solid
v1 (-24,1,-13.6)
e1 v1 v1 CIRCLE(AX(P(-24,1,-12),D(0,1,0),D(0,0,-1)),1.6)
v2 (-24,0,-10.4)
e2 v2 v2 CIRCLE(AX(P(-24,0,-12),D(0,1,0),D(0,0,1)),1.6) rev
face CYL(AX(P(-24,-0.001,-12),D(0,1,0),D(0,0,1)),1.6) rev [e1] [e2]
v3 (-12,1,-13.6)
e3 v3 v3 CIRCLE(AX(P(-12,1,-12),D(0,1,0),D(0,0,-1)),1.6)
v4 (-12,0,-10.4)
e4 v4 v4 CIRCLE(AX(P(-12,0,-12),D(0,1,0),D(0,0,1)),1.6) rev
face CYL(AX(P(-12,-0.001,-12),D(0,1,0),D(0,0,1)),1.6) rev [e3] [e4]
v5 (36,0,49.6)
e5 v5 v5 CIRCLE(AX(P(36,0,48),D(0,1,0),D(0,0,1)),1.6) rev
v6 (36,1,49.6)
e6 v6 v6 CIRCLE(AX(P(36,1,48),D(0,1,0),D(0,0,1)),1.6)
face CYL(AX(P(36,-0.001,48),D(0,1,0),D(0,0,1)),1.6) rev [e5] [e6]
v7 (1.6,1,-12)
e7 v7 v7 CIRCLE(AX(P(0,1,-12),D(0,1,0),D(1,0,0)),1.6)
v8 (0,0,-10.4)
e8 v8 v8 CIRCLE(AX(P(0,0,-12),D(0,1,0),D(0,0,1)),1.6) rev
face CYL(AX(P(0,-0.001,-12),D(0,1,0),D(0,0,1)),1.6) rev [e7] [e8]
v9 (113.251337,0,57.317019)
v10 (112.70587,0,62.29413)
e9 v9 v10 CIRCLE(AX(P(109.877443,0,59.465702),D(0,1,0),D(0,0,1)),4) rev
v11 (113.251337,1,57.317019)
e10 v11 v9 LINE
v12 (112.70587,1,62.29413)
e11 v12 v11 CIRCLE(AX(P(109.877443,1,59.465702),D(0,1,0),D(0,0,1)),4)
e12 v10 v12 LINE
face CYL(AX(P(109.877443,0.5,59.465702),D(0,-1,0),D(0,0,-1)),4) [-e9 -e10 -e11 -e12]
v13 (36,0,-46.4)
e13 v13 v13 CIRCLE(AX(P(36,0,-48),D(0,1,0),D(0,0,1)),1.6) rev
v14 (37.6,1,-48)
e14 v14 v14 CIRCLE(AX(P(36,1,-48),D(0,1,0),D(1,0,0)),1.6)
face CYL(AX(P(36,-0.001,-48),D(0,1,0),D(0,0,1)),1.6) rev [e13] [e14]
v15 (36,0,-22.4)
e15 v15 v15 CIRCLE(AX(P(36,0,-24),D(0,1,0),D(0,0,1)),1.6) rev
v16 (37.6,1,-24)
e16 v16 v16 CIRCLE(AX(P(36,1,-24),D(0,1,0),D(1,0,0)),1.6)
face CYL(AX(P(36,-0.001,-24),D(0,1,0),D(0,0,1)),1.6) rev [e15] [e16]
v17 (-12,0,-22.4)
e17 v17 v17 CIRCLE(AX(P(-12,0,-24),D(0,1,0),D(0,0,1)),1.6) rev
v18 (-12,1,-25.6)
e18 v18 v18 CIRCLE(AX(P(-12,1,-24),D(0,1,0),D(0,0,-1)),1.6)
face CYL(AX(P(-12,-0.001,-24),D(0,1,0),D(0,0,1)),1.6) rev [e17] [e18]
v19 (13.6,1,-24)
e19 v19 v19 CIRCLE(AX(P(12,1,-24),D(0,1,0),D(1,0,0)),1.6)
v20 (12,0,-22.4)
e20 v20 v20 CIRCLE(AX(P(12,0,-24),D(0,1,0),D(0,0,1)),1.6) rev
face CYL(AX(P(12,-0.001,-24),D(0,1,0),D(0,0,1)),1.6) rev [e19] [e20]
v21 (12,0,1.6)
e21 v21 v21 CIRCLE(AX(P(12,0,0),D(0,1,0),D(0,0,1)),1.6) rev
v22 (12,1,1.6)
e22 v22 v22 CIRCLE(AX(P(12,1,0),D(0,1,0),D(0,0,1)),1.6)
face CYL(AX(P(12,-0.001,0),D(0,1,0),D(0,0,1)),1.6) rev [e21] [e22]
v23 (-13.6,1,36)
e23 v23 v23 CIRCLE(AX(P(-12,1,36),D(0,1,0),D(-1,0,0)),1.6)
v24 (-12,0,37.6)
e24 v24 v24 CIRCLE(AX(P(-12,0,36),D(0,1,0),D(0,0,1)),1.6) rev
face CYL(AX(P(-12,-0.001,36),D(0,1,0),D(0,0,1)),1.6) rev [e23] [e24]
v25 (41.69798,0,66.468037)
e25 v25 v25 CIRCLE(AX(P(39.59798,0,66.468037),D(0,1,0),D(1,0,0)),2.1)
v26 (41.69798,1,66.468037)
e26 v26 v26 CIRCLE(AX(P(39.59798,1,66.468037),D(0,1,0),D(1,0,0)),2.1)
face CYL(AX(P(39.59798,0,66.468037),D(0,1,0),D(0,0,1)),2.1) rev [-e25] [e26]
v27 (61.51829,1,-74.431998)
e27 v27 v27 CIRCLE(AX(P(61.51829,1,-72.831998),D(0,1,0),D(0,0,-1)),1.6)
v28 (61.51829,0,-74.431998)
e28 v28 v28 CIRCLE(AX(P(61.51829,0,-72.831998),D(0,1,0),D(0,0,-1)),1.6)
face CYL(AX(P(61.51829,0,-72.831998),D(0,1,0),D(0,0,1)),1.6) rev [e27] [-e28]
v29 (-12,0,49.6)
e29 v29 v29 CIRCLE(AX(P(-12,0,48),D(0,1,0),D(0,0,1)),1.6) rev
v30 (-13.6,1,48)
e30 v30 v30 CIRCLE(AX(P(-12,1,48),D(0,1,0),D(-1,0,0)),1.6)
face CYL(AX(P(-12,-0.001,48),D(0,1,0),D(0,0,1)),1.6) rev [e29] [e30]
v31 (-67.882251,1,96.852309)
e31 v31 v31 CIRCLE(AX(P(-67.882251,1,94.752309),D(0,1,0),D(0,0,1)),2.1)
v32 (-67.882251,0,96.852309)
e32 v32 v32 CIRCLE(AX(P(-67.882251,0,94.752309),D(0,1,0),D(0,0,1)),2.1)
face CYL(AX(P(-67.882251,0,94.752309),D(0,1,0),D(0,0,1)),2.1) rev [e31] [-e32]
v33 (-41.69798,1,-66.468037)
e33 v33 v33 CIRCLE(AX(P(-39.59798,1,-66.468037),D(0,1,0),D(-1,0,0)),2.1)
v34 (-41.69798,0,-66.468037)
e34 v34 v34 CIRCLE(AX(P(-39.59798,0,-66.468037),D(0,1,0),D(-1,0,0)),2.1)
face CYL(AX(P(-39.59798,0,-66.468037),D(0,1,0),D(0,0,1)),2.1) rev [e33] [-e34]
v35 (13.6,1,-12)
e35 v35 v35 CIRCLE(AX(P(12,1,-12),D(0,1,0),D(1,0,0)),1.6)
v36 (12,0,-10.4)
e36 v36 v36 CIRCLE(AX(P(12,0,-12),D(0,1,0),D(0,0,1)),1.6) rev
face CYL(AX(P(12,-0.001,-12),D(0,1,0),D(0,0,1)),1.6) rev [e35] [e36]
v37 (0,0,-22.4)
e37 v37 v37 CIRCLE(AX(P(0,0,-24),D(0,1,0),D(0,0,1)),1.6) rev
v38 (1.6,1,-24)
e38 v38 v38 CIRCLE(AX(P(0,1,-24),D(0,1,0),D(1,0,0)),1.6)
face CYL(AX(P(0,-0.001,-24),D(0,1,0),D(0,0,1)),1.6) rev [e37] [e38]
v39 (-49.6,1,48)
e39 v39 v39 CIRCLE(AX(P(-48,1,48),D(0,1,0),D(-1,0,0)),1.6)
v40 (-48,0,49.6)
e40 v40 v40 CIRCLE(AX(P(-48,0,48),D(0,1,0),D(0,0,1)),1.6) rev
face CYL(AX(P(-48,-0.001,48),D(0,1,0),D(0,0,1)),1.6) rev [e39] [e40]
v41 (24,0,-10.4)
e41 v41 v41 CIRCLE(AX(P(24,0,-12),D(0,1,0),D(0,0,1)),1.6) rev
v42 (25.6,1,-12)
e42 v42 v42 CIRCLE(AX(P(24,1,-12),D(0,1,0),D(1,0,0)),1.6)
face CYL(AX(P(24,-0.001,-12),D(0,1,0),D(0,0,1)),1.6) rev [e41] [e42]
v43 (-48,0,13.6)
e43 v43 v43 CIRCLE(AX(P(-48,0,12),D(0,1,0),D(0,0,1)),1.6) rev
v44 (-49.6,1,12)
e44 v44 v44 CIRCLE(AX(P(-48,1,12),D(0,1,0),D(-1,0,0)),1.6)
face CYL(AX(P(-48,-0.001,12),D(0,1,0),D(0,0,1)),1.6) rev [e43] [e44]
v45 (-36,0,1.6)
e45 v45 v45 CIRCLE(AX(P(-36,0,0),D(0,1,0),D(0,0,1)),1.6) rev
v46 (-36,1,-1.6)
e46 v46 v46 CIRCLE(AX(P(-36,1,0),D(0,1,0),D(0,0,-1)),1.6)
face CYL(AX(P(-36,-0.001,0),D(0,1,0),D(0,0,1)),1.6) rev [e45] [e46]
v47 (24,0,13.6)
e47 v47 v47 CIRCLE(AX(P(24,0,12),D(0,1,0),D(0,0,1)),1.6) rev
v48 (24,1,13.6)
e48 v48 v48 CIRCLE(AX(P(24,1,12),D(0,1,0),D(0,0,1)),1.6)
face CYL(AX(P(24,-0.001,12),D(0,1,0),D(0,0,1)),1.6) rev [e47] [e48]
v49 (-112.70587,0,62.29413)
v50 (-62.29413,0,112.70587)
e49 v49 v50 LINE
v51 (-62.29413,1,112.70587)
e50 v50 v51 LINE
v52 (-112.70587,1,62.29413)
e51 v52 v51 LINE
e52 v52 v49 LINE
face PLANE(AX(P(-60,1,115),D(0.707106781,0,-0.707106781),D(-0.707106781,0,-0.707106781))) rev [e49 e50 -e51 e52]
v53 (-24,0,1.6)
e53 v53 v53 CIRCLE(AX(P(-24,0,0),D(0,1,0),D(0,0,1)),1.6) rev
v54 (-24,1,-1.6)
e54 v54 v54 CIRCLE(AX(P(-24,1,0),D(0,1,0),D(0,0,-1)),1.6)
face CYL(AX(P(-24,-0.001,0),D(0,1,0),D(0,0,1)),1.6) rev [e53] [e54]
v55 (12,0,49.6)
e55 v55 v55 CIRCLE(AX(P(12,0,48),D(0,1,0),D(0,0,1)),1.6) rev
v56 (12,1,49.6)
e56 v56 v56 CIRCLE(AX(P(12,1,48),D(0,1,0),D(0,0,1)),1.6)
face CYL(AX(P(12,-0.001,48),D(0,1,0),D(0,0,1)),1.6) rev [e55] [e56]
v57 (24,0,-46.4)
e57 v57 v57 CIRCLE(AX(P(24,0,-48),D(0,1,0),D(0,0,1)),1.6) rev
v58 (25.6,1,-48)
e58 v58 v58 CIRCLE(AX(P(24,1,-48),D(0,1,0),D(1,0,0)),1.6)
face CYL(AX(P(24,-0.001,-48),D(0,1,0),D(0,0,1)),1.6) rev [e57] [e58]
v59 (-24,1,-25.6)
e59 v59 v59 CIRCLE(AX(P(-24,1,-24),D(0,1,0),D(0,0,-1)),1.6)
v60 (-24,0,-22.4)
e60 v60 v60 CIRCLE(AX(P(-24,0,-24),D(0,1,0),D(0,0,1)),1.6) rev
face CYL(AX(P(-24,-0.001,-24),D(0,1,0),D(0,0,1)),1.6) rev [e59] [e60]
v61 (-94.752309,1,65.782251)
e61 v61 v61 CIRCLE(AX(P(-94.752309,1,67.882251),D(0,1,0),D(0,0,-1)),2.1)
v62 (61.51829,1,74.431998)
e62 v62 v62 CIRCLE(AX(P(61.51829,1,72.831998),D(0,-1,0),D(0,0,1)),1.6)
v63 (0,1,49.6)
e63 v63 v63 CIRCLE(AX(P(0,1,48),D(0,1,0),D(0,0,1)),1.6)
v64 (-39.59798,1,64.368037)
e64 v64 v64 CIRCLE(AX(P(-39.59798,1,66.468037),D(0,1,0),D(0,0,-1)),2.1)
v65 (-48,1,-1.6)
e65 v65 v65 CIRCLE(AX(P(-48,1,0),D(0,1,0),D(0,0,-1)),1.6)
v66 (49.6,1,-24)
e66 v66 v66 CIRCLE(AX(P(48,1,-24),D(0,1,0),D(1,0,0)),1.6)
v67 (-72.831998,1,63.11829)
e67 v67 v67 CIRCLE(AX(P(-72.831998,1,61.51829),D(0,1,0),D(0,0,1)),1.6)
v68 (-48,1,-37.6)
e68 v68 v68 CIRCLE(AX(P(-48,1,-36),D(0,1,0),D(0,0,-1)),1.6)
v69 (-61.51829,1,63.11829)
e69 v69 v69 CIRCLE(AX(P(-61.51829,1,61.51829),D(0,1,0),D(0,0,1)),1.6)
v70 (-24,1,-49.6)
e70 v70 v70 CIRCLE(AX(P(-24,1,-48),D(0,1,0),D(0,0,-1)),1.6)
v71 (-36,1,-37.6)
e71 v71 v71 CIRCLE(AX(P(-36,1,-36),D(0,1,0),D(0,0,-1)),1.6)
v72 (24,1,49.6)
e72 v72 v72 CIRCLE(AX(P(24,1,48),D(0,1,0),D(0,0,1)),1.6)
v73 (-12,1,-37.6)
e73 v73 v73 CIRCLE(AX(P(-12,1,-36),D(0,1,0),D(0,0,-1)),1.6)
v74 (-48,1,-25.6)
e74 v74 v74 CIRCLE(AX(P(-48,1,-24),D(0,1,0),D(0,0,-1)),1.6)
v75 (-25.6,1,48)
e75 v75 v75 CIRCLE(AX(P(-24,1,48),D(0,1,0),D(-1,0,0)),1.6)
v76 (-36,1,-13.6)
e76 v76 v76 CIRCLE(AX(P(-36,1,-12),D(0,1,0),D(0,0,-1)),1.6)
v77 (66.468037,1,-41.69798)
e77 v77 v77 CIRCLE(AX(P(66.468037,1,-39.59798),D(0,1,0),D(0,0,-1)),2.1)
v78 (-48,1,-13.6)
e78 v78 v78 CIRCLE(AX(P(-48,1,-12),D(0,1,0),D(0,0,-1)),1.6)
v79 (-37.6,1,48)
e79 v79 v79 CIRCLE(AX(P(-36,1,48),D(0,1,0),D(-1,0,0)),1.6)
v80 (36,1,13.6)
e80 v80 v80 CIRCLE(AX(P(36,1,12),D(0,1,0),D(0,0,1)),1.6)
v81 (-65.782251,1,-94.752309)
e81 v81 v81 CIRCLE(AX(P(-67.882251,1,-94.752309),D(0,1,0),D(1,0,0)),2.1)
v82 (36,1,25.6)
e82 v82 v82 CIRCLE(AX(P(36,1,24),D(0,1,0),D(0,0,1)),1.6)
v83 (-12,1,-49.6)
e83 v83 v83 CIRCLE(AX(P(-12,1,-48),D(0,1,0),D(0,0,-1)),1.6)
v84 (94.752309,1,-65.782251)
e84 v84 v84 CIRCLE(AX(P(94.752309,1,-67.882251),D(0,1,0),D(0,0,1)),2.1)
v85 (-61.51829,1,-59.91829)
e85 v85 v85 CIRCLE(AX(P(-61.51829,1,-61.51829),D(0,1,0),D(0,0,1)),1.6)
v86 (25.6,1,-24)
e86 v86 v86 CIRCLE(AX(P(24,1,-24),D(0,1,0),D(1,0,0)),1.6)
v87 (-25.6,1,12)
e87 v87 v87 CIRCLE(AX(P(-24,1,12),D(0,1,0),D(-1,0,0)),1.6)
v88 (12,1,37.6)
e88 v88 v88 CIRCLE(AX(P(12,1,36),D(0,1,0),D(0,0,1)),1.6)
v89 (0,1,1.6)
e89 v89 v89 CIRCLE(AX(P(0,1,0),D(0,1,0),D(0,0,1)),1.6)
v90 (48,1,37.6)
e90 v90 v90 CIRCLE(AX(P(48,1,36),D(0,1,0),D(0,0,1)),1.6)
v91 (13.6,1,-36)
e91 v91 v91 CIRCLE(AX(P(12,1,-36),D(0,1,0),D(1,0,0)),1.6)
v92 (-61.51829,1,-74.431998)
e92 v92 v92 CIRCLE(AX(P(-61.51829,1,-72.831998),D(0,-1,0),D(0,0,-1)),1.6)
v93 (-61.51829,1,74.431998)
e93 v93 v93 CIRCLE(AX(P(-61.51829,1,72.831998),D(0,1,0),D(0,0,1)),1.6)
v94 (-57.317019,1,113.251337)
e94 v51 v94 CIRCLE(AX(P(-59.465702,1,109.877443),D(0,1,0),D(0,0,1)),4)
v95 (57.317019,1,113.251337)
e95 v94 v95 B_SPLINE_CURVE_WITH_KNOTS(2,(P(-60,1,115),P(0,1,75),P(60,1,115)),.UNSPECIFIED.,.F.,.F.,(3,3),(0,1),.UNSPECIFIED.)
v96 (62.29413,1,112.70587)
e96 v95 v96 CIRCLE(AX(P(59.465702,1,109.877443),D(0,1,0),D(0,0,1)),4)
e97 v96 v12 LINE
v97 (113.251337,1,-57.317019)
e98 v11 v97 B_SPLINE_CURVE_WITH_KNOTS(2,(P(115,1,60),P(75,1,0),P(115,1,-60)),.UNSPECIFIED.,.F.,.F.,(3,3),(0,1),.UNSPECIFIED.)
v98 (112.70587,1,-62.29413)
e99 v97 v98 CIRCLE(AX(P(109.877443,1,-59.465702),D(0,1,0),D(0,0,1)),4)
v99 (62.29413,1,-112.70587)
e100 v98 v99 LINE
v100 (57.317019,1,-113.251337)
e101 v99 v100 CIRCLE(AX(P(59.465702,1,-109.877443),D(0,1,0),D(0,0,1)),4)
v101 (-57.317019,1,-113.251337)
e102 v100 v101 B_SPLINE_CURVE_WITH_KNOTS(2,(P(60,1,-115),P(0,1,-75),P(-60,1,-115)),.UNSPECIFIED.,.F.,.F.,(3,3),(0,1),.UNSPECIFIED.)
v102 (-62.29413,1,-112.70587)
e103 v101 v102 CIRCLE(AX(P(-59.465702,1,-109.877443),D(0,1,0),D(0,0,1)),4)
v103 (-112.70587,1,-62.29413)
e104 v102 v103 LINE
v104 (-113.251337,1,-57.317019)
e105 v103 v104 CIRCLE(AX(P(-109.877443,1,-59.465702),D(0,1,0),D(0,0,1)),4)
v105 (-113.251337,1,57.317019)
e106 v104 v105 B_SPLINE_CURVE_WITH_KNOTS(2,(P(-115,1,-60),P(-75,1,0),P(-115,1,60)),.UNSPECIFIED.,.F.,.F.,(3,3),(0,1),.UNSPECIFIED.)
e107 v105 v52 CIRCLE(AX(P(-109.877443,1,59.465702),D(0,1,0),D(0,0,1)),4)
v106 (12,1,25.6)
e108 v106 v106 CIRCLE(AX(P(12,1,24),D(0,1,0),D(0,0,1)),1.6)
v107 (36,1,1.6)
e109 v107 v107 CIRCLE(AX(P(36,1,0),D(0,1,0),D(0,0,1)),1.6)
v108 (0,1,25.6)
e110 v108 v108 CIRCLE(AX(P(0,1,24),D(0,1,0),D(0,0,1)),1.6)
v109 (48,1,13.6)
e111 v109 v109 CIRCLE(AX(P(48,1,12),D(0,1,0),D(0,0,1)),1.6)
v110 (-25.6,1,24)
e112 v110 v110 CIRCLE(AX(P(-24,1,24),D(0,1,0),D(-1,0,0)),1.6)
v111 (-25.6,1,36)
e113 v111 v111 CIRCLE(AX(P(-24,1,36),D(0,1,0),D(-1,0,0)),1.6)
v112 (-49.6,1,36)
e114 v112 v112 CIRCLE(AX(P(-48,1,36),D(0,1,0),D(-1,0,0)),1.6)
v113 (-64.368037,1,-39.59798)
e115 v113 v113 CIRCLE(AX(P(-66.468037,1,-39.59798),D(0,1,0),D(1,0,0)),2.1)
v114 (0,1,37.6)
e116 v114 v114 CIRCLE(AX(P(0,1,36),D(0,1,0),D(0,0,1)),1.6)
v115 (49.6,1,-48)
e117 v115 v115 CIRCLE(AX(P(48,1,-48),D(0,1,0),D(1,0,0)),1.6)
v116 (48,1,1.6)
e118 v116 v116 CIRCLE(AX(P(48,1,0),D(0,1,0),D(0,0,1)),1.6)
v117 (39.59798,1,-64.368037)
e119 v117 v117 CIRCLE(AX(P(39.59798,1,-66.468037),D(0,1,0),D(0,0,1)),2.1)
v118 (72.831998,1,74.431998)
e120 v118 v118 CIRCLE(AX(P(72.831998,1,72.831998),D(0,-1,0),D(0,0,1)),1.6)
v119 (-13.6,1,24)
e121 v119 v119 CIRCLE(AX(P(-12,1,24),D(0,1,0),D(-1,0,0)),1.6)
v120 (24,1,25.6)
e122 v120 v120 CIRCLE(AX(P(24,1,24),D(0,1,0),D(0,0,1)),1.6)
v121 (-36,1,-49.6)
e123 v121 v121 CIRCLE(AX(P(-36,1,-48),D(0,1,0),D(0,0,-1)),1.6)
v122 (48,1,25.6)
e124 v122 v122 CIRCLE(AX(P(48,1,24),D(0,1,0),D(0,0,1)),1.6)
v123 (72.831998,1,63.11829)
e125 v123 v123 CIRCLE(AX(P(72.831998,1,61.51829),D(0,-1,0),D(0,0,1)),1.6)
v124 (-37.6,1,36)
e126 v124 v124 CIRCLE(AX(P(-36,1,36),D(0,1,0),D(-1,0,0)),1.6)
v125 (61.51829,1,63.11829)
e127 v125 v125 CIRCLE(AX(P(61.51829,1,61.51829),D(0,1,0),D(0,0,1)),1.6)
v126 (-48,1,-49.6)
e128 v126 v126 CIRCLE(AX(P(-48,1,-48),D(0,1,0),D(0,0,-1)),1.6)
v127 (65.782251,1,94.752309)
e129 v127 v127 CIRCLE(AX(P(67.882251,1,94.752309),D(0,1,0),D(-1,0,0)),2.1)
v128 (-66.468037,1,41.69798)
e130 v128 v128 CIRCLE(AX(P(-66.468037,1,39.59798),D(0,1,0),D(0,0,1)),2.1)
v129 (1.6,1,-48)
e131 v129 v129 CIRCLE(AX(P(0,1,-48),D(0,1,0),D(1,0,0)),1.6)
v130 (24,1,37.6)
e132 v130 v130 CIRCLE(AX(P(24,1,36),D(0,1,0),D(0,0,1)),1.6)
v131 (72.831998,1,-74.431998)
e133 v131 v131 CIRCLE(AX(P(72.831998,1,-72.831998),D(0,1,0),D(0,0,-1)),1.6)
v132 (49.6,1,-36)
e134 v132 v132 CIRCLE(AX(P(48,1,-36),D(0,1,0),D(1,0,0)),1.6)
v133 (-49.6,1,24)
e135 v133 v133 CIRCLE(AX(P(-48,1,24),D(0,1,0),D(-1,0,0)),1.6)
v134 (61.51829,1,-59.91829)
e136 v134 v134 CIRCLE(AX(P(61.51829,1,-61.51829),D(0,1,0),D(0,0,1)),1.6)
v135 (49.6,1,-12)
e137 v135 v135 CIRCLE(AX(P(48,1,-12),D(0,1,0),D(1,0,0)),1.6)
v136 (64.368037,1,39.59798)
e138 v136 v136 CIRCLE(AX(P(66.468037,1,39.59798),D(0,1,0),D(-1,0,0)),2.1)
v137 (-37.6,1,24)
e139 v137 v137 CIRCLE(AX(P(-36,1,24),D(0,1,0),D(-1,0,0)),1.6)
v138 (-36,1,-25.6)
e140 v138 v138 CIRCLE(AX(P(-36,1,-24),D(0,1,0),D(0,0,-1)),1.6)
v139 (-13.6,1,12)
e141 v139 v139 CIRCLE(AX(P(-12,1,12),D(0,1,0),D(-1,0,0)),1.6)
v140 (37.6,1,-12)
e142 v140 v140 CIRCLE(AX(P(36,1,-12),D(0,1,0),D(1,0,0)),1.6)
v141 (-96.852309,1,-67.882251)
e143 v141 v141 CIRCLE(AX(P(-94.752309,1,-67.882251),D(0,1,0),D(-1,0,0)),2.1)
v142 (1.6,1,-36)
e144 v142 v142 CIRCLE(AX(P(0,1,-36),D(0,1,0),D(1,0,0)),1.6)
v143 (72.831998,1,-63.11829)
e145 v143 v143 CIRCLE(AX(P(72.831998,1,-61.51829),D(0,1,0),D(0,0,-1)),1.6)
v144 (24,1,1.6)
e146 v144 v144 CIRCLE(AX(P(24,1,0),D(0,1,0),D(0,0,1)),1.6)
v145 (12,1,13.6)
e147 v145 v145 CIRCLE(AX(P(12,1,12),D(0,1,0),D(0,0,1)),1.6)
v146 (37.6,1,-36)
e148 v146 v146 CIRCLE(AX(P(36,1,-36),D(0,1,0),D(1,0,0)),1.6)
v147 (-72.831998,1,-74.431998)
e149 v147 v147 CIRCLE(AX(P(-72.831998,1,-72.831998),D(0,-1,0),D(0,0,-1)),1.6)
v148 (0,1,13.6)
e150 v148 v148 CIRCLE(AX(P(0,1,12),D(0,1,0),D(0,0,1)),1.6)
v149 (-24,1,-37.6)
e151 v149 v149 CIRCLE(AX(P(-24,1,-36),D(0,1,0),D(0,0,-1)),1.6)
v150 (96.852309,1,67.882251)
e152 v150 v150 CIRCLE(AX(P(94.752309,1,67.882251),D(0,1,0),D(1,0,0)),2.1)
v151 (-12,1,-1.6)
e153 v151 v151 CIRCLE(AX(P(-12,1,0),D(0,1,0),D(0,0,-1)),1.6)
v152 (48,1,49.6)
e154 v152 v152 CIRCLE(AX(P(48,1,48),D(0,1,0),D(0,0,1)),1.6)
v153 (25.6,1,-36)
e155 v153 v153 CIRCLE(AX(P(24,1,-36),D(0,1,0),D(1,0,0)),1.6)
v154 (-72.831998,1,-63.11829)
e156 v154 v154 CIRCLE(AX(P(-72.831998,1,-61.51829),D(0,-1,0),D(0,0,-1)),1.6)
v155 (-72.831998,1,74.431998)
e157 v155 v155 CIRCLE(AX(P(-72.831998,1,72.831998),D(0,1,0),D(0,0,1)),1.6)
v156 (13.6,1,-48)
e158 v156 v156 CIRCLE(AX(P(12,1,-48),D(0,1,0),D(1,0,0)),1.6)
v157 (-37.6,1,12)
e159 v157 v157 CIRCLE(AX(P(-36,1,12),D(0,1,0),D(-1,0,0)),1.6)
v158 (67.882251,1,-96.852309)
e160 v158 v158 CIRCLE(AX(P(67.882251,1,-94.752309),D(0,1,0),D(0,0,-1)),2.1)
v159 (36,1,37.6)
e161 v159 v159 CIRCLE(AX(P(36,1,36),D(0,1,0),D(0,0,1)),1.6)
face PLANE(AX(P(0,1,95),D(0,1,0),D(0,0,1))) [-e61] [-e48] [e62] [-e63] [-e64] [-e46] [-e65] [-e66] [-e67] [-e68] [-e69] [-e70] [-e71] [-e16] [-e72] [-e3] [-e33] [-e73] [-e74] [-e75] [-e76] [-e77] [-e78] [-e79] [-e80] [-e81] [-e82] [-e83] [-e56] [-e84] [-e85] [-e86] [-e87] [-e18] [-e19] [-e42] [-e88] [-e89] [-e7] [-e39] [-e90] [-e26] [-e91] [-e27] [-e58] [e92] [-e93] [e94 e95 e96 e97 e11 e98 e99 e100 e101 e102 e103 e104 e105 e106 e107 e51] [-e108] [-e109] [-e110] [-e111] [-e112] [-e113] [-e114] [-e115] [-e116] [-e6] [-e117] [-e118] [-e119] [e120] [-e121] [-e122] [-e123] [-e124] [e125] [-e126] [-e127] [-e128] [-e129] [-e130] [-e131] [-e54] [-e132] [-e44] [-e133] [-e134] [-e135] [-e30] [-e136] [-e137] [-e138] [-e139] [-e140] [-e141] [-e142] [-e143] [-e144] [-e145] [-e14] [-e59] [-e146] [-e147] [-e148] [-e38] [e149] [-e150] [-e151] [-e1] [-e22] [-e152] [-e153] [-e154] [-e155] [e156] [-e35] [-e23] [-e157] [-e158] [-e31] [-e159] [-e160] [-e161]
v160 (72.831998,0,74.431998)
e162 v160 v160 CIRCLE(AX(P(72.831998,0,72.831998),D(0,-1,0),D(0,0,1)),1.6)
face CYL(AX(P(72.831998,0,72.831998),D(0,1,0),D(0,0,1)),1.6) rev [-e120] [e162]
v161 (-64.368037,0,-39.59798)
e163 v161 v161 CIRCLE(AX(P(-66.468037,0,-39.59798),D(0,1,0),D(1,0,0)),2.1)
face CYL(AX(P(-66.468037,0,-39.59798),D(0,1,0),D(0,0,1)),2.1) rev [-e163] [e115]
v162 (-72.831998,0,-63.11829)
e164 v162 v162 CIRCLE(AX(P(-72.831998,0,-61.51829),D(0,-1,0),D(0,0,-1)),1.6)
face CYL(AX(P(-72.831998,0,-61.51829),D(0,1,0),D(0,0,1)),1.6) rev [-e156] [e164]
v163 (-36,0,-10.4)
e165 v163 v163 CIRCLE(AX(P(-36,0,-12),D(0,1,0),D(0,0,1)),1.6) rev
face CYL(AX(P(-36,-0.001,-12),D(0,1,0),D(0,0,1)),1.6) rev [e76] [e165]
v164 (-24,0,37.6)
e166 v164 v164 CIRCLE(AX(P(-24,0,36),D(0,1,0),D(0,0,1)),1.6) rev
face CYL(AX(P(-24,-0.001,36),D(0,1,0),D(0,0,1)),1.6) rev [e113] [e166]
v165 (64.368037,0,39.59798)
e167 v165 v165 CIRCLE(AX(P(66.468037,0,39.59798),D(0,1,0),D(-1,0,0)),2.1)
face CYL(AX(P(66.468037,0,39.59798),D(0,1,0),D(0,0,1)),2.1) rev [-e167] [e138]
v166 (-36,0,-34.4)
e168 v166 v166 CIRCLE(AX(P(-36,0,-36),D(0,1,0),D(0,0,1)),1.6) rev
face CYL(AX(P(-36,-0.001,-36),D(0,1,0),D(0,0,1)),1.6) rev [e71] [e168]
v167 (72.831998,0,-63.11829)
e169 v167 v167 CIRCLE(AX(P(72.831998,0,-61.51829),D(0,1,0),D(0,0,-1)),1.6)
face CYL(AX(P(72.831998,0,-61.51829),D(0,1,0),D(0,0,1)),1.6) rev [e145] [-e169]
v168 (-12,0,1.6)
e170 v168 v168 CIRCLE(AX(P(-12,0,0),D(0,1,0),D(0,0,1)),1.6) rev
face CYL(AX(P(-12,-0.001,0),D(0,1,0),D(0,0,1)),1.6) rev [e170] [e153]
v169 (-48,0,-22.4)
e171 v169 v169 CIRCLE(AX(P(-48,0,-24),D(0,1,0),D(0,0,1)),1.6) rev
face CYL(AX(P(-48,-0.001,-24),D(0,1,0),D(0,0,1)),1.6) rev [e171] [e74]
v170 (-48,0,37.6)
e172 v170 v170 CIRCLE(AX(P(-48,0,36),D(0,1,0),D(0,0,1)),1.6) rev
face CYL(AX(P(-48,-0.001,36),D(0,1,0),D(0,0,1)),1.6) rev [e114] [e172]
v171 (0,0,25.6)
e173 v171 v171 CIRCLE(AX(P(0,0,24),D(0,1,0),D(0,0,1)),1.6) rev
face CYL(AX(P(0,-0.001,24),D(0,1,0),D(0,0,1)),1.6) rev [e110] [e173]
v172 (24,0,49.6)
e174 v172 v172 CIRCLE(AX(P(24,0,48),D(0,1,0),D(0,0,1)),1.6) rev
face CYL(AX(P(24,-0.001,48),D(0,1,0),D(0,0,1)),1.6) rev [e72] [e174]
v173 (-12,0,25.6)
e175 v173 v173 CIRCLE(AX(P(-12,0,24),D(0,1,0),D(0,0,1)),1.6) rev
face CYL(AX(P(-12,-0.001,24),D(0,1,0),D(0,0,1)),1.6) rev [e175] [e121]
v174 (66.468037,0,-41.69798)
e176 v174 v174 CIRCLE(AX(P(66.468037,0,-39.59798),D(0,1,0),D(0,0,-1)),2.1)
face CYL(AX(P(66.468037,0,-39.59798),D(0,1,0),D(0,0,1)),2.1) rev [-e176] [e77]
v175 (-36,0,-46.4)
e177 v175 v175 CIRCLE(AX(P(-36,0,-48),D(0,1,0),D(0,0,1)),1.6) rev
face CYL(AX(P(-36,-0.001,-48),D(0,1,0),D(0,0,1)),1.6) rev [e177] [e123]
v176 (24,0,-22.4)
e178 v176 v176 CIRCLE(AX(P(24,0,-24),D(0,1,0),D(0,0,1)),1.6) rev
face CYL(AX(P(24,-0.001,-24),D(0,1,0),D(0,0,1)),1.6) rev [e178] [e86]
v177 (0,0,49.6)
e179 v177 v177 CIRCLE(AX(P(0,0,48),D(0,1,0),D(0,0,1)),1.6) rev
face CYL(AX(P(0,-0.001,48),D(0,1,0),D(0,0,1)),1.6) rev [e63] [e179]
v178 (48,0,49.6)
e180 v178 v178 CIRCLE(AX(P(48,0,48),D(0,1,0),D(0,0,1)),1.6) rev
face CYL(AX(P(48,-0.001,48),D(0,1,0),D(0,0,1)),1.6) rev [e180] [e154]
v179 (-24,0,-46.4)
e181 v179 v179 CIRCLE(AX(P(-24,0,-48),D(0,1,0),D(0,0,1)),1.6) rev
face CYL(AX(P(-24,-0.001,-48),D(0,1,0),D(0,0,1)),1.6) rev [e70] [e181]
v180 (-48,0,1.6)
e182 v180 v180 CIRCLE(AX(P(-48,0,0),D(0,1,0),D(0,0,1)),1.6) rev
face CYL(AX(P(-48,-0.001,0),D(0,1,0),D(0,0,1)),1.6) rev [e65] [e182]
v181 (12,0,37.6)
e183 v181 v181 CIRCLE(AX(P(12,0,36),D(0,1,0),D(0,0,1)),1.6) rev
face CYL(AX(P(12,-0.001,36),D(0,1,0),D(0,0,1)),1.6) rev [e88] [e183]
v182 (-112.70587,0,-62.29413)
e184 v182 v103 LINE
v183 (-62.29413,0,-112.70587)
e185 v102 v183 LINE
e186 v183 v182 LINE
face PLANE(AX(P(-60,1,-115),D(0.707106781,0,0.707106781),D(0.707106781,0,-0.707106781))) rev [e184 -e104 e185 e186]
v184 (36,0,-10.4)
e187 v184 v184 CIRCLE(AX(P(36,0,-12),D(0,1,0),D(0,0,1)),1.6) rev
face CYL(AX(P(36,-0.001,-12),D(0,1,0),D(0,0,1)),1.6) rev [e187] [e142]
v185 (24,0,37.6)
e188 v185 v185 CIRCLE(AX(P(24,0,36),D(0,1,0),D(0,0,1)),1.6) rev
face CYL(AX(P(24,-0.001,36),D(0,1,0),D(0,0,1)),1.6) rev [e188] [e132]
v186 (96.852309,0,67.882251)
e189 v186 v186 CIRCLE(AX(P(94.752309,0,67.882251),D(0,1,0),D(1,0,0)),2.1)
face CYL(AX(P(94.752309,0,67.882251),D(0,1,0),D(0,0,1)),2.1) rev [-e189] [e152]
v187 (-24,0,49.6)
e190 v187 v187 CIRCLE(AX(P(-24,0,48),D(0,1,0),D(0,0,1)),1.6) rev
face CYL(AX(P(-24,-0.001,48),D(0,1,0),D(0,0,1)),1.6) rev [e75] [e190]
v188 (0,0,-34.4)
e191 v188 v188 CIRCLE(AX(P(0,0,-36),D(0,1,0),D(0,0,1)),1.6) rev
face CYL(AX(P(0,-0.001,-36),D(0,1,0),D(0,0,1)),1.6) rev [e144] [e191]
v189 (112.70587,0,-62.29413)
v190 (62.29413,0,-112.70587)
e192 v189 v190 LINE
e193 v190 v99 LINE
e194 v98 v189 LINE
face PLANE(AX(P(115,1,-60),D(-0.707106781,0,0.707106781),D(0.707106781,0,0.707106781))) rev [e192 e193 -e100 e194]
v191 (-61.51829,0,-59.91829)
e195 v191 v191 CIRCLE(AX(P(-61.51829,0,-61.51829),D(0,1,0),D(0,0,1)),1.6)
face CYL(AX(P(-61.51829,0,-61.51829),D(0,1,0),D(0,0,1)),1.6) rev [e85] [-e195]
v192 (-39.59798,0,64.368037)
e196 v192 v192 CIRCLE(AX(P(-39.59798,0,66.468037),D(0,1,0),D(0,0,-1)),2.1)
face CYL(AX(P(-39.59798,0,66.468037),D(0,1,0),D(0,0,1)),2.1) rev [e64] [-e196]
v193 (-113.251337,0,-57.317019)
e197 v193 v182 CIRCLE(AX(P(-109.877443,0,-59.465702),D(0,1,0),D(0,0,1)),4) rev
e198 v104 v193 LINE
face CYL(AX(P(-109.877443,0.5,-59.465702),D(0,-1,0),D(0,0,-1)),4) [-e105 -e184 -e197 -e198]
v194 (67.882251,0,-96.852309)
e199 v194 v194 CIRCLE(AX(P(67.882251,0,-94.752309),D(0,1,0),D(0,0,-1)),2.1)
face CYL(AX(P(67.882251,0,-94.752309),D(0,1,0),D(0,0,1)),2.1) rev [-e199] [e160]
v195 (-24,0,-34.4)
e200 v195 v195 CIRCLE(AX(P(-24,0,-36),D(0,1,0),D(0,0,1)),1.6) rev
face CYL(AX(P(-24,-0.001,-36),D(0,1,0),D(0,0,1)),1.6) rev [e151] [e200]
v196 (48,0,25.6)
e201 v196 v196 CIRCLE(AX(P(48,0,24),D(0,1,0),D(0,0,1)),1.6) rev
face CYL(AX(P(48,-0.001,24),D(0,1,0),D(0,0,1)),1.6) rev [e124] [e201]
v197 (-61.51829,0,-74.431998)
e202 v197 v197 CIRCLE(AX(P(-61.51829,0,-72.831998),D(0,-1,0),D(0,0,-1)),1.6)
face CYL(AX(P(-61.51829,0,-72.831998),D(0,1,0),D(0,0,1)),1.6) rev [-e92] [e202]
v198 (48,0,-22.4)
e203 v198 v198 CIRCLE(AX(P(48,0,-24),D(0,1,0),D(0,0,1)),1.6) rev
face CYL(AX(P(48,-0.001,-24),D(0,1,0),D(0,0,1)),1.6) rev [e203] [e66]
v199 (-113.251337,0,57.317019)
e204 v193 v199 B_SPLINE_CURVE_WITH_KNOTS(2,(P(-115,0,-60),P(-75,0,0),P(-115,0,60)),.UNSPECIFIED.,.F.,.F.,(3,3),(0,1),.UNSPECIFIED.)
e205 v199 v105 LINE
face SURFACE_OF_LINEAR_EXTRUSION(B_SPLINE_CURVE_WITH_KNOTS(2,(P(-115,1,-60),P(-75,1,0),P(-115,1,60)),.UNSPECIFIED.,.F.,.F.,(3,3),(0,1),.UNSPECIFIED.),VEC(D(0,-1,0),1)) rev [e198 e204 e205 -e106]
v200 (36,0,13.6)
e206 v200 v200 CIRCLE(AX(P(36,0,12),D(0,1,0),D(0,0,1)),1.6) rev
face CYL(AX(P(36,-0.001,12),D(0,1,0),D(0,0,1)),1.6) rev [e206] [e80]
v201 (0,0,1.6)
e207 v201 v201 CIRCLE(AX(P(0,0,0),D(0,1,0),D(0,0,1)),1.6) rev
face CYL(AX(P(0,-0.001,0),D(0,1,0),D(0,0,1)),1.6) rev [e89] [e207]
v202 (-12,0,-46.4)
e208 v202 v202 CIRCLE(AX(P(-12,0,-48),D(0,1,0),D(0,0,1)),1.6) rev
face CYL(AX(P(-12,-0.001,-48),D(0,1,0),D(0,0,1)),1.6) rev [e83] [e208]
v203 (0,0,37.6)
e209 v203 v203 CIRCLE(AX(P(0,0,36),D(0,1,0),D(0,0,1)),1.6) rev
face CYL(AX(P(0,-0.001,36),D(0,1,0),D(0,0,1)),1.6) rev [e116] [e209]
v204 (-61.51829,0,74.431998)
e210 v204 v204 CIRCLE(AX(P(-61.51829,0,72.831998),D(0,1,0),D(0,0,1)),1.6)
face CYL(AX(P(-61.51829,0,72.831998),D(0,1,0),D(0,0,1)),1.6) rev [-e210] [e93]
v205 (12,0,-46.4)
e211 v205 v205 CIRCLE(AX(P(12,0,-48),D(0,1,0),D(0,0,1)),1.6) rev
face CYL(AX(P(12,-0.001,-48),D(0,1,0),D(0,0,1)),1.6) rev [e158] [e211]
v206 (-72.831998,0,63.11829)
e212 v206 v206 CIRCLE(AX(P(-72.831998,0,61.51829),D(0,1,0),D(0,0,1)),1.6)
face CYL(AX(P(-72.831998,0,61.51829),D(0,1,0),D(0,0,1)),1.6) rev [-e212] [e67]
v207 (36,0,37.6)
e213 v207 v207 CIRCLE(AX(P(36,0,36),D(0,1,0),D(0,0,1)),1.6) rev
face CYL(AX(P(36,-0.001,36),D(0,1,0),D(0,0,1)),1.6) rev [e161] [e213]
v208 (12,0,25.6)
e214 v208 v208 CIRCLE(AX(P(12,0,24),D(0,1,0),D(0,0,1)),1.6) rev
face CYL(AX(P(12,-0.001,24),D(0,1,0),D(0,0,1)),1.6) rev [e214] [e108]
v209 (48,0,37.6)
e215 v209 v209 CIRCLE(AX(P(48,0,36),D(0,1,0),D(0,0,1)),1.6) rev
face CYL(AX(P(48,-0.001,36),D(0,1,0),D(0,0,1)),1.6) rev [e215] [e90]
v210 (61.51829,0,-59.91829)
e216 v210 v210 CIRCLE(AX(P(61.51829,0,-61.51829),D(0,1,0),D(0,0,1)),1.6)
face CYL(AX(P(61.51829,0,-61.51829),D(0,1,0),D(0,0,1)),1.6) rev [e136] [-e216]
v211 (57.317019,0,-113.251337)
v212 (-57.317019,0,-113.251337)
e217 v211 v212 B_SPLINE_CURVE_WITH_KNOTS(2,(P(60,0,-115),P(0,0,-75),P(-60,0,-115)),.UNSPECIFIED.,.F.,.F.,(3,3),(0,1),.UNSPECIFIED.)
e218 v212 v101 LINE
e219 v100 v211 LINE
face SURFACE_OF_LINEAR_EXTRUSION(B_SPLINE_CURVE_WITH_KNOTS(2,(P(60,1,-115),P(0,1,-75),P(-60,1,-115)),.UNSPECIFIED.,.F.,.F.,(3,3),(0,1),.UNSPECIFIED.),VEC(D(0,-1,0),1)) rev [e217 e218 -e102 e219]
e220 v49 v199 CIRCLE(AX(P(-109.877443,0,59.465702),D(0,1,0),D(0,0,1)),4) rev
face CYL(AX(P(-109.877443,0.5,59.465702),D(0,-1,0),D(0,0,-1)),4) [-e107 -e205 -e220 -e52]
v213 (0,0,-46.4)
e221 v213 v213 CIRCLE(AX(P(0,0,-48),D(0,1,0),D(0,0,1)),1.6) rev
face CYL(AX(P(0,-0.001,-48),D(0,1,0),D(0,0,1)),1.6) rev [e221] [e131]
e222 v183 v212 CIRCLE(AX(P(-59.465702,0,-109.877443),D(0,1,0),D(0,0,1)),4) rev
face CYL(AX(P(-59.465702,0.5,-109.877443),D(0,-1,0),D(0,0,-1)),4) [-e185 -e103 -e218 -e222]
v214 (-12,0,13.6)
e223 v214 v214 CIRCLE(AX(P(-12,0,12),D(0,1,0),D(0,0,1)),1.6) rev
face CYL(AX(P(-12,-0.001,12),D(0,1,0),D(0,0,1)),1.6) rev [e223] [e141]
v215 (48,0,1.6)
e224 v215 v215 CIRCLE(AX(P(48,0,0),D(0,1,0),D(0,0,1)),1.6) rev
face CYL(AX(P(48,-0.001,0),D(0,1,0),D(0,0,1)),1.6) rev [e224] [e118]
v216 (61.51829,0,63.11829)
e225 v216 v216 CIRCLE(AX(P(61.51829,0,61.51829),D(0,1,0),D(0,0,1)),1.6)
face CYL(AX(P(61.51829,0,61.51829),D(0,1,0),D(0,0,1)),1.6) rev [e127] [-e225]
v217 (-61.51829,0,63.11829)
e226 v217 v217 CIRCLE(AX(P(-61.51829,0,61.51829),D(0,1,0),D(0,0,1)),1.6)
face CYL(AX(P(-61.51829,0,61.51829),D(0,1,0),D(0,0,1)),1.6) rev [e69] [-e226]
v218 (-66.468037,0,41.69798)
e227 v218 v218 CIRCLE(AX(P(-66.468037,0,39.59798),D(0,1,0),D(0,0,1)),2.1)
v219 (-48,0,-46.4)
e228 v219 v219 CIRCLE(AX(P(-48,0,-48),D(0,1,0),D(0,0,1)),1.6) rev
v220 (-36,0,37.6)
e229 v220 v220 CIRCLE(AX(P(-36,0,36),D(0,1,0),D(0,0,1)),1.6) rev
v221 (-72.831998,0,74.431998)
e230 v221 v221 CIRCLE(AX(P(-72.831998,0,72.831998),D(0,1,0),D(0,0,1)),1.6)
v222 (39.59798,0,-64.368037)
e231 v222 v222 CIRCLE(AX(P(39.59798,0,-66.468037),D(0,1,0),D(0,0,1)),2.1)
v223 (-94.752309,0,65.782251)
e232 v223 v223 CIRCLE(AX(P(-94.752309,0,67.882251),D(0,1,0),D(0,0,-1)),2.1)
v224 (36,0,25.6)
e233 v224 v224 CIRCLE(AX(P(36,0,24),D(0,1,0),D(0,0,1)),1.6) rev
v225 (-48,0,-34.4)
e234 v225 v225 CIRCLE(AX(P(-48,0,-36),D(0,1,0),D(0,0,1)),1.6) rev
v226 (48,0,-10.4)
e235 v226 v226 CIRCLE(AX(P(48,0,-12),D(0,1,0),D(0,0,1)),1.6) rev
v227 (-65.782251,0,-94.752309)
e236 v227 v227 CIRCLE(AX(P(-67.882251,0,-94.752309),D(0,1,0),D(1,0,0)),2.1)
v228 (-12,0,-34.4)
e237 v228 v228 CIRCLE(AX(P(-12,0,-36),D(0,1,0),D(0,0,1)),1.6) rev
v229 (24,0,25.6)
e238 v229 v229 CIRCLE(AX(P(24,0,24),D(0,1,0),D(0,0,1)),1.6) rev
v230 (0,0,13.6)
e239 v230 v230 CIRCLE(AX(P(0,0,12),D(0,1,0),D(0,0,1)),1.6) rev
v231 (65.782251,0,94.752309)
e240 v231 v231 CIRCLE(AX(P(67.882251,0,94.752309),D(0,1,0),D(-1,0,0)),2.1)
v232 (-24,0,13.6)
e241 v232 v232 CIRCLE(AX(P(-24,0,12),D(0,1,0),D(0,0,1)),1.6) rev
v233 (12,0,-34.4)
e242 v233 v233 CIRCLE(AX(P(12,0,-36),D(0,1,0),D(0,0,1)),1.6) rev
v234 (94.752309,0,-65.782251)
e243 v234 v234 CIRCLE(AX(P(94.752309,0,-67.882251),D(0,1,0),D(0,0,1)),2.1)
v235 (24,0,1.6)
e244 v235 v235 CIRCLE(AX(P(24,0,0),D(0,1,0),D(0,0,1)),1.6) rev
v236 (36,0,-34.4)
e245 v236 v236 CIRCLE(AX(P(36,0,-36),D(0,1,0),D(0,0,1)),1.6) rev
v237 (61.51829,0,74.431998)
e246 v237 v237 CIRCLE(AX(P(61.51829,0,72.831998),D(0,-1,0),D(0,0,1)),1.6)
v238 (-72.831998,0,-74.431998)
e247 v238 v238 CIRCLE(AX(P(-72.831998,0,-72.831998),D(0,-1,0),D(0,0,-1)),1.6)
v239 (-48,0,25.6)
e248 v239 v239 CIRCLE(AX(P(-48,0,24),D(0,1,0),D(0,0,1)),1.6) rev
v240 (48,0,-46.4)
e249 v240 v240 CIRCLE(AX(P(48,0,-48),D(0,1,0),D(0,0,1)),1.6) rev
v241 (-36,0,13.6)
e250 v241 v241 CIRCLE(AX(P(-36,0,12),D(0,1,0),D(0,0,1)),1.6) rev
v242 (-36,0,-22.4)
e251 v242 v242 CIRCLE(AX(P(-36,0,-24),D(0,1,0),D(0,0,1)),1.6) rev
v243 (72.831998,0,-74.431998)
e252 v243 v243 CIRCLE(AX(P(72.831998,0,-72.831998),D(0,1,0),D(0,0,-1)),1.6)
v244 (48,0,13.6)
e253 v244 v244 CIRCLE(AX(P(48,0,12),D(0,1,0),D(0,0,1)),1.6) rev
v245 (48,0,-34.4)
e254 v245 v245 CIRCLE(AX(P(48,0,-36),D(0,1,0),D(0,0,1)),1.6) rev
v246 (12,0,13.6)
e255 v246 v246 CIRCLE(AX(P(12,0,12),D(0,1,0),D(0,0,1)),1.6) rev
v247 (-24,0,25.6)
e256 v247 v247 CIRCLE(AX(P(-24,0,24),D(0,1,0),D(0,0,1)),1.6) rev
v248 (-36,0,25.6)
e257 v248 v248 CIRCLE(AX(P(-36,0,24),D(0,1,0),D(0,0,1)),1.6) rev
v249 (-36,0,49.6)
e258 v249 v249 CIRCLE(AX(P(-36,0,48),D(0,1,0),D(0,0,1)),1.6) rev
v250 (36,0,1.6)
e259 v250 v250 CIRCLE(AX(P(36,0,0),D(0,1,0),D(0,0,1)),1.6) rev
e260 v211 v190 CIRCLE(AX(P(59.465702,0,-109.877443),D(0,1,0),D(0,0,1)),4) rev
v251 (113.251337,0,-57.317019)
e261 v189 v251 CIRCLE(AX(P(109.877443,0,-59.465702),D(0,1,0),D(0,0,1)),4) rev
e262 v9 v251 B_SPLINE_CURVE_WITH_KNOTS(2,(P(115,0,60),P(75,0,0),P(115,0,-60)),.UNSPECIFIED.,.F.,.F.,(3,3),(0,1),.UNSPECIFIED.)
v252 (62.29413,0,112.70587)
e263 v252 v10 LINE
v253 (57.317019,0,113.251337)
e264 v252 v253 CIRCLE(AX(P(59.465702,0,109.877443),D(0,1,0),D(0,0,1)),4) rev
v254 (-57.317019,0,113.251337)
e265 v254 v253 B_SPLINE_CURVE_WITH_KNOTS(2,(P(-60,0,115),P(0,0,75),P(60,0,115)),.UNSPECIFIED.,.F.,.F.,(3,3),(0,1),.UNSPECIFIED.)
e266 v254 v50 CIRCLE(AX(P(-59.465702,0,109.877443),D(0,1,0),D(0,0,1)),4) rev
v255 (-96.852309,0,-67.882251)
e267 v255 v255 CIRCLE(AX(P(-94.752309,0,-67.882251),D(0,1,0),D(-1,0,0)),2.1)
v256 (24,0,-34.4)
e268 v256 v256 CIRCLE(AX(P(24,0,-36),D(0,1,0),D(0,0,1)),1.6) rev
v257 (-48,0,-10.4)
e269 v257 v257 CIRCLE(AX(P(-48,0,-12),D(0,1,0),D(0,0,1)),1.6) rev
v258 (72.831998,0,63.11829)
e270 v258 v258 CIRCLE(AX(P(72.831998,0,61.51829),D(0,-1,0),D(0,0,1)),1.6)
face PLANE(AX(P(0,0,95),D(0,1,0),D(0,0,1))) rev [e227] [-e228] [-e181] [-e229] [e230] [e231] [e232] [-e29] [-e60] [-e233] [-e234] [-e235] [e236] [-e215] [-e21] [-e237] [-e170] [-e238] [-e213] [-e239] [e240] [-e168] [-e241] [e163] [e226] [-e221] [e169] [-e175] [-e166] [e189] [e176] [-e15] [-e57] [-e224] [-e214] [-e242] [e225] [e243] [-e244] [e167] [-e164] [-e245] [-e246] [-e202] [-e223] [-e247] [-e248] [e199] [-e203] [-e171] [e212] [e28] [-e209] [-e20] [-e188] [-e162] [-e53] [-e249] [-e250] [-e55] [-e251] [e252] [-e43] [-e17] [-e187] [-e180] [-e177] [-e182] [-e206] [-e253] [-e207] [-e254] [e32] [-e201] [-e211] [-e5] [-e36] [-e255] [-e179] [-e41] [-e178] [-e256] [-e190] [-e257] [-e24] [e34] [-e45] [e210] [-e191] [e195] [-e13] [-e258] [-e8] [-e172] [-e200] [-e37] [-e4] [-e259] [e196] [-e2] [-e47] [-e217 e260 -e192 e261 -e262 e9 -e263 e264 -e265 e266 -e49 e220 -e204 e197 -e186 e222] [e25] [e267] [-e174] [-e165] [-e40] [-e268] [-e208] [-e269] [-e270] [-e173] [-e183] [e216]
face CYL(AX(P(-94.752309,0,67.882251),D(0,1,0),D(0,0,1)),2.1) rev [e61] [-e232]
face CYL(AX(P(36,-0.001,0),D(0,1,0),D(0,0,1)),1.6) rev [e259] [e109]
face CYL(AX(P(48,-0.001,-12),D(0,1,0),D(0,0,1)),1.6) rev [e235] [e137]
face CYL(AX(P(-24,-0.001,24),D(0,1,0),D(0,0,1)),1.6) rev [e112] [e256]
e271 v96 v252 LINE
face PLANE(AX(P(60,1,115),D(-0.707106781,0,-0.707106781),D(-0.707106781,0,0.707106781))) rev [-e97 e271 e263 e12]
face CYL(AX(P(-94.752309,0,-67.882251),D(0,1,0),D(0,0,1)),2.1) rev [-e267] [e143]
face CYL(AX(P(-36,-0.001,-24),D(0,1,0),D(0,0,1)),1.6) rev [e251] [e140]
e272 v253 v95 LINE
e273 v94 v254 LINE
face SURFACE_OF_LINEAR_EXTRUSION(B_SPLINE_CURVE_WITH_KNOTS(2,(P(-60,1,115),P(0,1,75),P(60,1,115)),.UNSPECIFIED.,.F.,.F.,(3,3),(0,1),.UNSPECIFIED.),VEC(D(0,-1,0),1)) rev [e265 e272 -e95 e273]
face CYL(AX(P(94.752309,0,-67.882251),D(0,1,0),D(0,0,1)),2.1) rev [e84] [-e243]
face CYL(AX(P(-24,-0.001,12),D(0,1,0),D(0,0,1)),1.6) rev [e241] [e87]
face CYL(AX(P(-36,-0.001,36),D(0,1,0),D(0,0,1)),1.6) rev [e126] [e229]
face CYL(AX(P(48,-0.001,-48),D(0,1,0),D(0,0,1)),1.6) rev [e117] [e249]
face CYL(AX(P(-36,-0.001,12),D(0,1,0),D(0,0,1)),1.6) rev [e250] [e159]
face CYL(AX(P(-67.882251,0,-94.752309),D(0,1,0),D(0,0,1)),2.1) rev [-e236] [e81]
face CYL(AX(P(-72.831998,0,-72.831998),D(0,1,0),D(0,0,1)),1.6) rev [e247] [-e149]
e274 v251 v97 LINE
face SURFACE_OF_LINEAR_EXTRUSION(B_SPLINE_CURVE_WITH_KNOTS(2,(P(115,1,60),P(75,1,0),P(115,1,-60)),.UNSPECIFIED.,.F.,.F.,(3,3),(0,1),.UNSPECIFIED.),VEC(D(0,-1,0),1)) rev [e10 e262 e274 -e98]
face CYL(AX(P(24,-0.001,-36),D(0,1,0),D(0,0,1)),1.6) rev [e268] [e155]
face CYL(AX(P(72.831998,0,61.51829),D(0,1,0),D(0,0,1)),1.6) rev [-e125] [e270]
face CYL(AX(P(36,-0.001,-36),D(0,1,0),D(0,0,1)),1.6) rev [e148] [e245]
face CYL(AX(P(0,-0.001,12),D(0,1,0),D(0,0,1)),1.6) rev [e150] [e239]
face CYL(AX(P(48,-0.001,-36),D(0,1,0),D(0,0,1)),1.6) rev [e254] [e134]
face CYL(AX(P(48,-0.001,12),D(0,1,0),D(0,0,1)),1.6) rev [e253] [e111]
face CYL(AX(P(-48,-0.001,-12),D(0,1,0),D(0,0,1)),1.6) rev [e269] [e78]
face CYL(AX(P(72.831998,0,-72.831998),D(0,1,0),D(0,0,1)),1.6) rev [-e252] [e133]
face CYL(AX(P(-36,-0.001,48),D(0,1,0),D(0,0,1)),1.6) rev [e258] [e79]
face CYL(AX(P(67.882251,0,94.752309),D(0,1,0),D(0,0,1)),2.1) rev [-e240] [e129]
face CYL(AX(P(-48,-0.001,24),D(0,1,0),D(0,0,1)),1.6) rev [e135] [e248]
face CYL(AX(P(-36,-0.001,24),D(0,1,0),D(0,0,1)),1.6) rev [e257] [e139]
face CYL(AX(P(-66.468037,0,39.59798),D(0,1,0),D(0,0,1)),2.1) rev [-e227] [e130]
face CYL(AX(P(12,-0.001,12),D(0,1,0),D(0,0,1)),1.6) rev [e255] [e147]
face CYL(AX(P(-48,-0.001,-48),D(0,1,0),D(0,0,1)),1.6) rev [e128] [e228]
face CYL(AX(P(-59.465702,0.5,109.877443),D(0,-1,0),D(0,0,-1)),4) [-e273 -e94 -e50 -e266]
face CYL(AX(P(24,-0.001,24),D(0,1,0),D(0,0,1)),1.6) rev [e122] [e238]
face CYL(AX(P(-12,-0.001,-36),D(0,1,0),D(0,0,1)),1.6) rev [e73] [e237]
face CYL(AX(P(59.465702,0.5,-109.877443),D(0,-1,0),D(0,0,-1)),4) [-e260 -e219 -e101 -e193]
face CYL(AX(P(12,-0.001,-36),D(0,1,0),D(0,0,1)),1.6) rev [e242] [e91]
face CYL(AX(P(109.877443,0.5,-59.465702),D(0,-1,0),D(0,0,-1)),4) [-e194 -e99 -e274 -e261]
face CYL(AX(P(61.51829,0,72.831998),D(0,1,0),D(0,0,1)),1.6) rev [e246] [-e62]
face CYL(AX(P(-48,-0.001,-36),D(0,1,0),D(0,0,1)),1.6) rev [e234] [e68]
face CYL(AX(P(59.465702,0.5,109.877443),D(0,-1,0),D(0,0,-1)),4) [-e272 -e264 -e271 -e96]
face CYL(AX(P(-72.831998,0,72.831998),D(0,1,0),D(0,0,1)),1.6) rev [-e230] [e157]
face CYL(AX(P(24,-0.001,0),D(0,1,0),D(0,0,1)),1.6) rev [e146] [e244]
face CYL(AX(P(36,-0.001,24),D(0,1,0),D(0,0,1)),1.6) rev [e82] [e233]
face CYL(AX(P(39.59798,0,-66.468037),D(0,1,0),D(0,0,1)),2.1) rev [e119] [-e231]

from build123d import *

# Parameters (mm, degrees)
DODANIE_WYCI_GNI_CIE1_DEPTH = 1
ZAOKR_GLENIE1_R             = 4
SZKIC2_R                    = 2.1
WYTNIJ_WYCI_GNI_CIE1_DEPTH  = 162.050129512
SZYK_KO_OWY1_COUNT          = 4
SZKIC3_R                    = 1.6
WYTNIJ_WYCI_GNI_CIE2_DEPTH  = 162.050129512
SZYK_KO_OWY2_OUTLINE_R      = 1.6
SZYK_KO_OWY2_DEPTH          = 1
WYTNIJ_WYCI_GNI_CIE3_REACH  = 163.05
SZKIC4_R                    = 1.6
SZYK_LINIOWY1_COUNT         = 5
SZYK_LINIOWY1_PITCH         = 12
SZYK_LINIOWY1_COUNT_DIR2    = 5
SZYK_LINIOWY1_PITCH_DIR2    = 12
SZYK_KO_OWY3_OUTLINE_R      = 1.6
SZYK_KO_OWY3_DEPTH          = 1


# Read off the part's stored shape, not the designer's step: Szyk kołowy2, Szyk kołowy3
with BuildPart() as part:
    # Szkic1 → Dodanie-wyciągnięcie1 (new body)
    with BuildSketch(Plane(origin=(0, 0, 0), x_dir=(1, 0, 0), z_dir=(0, 1, 0))):
        with BuildLine():
            Line((-60, -115), (-115, -60))
            add(Edge.make_bspline(
                [(-115, 60), (-75, 0), (-115, -60)],
                knots=[0, 0, 0, 1, 1, 1], degree=2))
            Line((-115, 60), (-60, 115))
            add(Edge.make_bspline(
                [(60, 115), (0, 75), (-60, 115)],
                knots=[0, 0, 0, 1, 1, 1], degree=2))
            Line((60, 115), (115, 60))
            add(Edge.make_bspline(
                [(115, -60), (75, 0), (115, 60)],
                knots=[0, 0, 0, 1, 1, 1], degree=2))
            Line((115, -60), (60, -115))
            add(Edge.make_bspline(
                [(-60, -115), (0, -75), (60, -115)],
                knots=[0, 0, 0, 1, 1, 1], degree=2))
        make_face()
    extrude(amount=DODANIE_WYCI_GNI_CIE1_DEPTH)

    # Zaokrąglenie1
    zaokr_glenie1_edges = [part.edges().sort_by_distance(p)[0] for p in [
        (-115, 0.5, -60),
        (-60, 0.5, -115),
        (60, 0.5, -115),
        (115, 0.5, -60),
        (115, 0.5, 60),
        (60, 0.5, 115),
        (-115, 0.5, 60),
        (-60, 0.5, 115),
    ]]
    fillet(zaokr_glenie1_edges, radius=ZAOKR_GLENIE1_R)

    # Szkic2 → Wytnij-wyciągnięcie1 (cut, through all)
    with BuildSketch(Plane(origin=(0, 1, 0), x_dir=(1, 0, 0), z_dir=(0, 1, 0))):
        with Locations(Location((-67.882250994, -94.752308679, 0), (0, 0, 270))):
            Circle(SZKIC2_R)
        with Locations(Location((-94.752308679, -67.882250994, 0), (0, 0, 90))):
            Circle(SZKIC2_R)
        with Locations(Location((-39.597979746, -66.468037432, 0), (0, 0, 90))):
            Circle(SZKIC2_R)
        with Locations(Location((-66.468037432, -39.597979746, 0), (0, 0, 270))):
            Circle(SZKIC2_R)
    wytnij_wyci_gni_cie1 = extrude(amount=-WYTNIJ_WYCI_GNI_CIE1_DEPTH, mode=Mode.SUBTRACT)

    # Szyk kołowy1: Wytnij-wyciągnięcie1 ×4 about axis
    szyk_ko_owy1_axis = Axis((0, 0, 0), (0, 1, 0))
    for i in range(1, SZYK_KO_OWY1_COUNT):
        add(wytnij_wyci_gni_cie1.rotate(szyk_ko_owy1_axis, i * 360 / SZYK_KO_OWY1_COUNT), mode=Mode.SUBTRACT)

    # Szkic3 → Wytnij-wyciągnięcie2 (cut, through all)
    with BuildSketch(Plane(origin=(0, 1, 0), x_dir=(1, 0, 0), z_dir=(0, 1, 0))):
        with Locations(Location((-61.518289963, -61.518289963, 0), (0, 0, 270))):
            Circle(SZKIC3_R)
        with Locations(Location((-61.518289963, 61.518289963, 0), (0, 0, 270))):
            Circle(SZKIC3_R)
        with Locations(Location((61.518289963, 61.518289963, 0), (0, 0, 270))):
            Circle(SZKIC3_R)
        with Locations(Location((61.518289963, -61.518289963, 0), (0, 0, 270))):
            Circle(SZKIC3_R)
        with Locations(Location((-72.831998462, -72.831998462, 0), (0, 0, 270))):
            Circle(SZKIC3_R)
        with Locations(Location((-61.518289963, -72.831998462, 0), (0, 0, 270))):
            Circle(SZKIC3_R)
        with Locations(Location((-72.831998462, -61.518289963, 0), (0, 0, 270))):
            Circle(SZKIC3_R)
    wytnij_wyci_gni_cie2 = extrude(amount=-WYTNIJ_WYCI_GNI_CIE2_DEPTH, mode=Mode.SUBTRACT)

    # Lustro1: Wytnij-wyciągnięcie2 across plane
    add(wytnij_wyci_gni_cie2.mirror(Plane(origin=(0, 0, 0), x_dir=(0, 0, 1), z_dir=(1, 0, 0))), mode=Mode.SUBTRACT)

    # Szyk kołowy2 outline → Szyk kołowy2 (cut)
    with BuildSketch(Plane(origin=(0, 0, 0), x_dir=(1, 0, 0), z_dir=(0, 1, 0))):
        with Locations((-61.518289963, 72.831998462)):
            Circle(SZYK_KO_OWY2_OUTLINE_R)
        with Locations((-72.831998462, 72.831998462)):
            Circle(SZYK_KO_OWY2_OUTLINE_R)
        with Locations((-72.831998462, 61.518289963)):
            Circle(SZYK_KO_OWY2_OUTLINE_R)
        with Locations((61.518289963, 72.831998462)):
            Circle(SZYK_KO_OWY2_OUTLINE_R)
        with Locations((72.831998462, 72.831998462)):
            Circle(SZYK_KO_OWY2_OUTLINE_R)
        with Locations((72.831998462, 61.518289963)):
            Circle(SZYK_KO_OWY2_OUTLINE_R)
    extrude(amount=SZYK_KO_OWY2_DEPTH, mode=Mode.SUBTRACT)

    # Szkic4 → Wytnij-wyciągnięcie3 (cut, up to next)
    with BuildSketch(Plane(origin=(0, 1, 0), x_dir=(1, 0, 0), z_dir=(0, 1, 0)), mode=Mode.PRIVATE) as wytnij_wyci_gni_cie3_sk1:
        with Locations(Location((0, 0, 0), (0, 0, 270))):
            Circle(SZKIC4_R)
    wytnij_wyci_gni_cie3_tool1 = extrude(wytnij_wyci_gni_cie3_sk1.sketch, amount=-WYTNIJ_WYCI_GNI_CIE3_REACH, mode=Mode.PRIVATE) & part.part
    wytnij_wyci_gni_cie3 = wytnij_wyci_gni_cie3_tool1.solids().sort_by_distance((0, 1, 0))[0]
    add(wytnij_wyci_gni_cie3, mode=Mode.SUBTRACT)

    # Szyk liniowy1: Wytnij-wyci_gni_cie3 5 × 5
    with Locations(*[(j * SZYK_LINIOWY1_PITCH_DIR2, 0, i * SZYK_LINIOWY1_PITCH) for i in range(SZYK_LINIOWY1_COUNT) for j in range(SZYK_LINIOWY1_COUNT_DIR2) if (i, j) != (0, 0)]):
        add(wytnij_wyci_gni_cie3, mode=Mode.SUBTRACT)

    # Szyk kołowy3 outline → Szyk kołowy3 (cut)
    with BuildSketch(Plane(origin=(0, 0, 0), x_dir=(1, 0, 0), z_dir=(0, 1, 0))):
        with Locations((36, 48)):
            Circle(SZYK_KO_OWY3_OUTLINE_R)
        with Locations((36, 36)):
            Circle(SZYK_KO_OWY3_OUTLINE_R)
        with Locations((36, 24)):
            Circle(SZYK_KO_OWY3_OUTLINE_R)
        with Locations((48, 12)):
            Circle(SZYK_KO_OWY3_OUTLINE_R)
        with Locations((48, 24)):
            Circle(SZYK_KO_OWY3_OUTLINE_R)
        with Locations((48, 36)):
            Circle(SZYK_KO_OWY3_OUTLINE_R)
        with Locations((48, 48)):
            Circle(SZYK_KO_OWY3_OUTLINE_R)
        with Locations((0, 12)):
            Circle(SZYK_KO_OWY3_OUTLINE_R)
        with Locations((0, 24)):
            Circle(SZYK_KO_OWY3_OUTLINE_R)
        with Locations((0, 36)):
            Circle(SZYK_KO_OWY3_OUTLINE_R)
        with Locations((0, 48)):
            Circle(SZYK_KO_OWY3_OUTLINE_R)
        with Locations((12, 12)):
            Circle(SZYK_KO_OWY3_OUTLINE_R)
        with Locations((12, 24)):
            Circle(SZYK_KO_OWY3_OUTLINE_R)
        with Locations((12, 36)):
            Circle(SZYK_KO_OWY3_OUTLINE_R)
        with Locations((36, 12)):
            Circle(SZYK_KO_OWY3_OUTLINE_R)
        with Locations((24, 48)):
            Circle(SZYK_KO_OWY3_OUTLINE_R)
        with Locations((24, 36)):
            Circle(SZYK_KO_OWY3_OUTLINE_R)
        with Locations((12, 48)):
            Circle(SZYK_KO_OWY3_OUTLINE_R)
        with Locations((24, 12)):
            Circle(SZYK_KO_OWY3_OUTLINE_R)
        with Locations((24, 24)):
            Circle(SZYK_KO_OWY3_OUTLINE_R)
        with Locations((-48, 36)):
            Circle(SZYK_KO_OWY3_OUTLINE_R)
        with Locations((-36, 36)):
            Circle(SZYK_KO_OWY3_OUTLINE_R)
        with Locations((-24, 36)):
            Circle(SZYK_KO_OWY3_OUTLINE_R)
        with Locations((-12, 48)):
            Circle(SZYK_KO_OWY3_OUTLINE_R)
        with Locations((-24, 48)):
            Circle(SZYK_KO_OWY3_OUTLINE_R)
        with Locations((-36, 48)):
            Circle(SZYK_KO_OWY3_OUTLINE_R)
        with Locations((-48, 48)):
            Circle(SZYK_KO_OWY3_OUTLINE_R)
        with Locations((-12, 0)):
            Circle(SZYK_KO_OWY3_OUTLINE_R)
        with Locations((-24, 0)):
            Circle(SZYK_KO_OWY3_OUTLINE_R)
        with Locations((-36, 0)):
            Circle(SZYK_KO_OWY3_OUTLINE_R)
        with Locations((-48, 0)):
            Circle(SZYK_KO_OWY3_OUTLINE_R)
        with Locations((-12, 12)):
            Circle(SZYK_KO_OWY3_OUTLINE_R)
        with Locations((-24, 12)):
            Circle(SZYK_KO_OWY3_OUTLINE_R)
        with Locations((-36, 12)):
            Circle(SZYK_KO_OWY3_OUTLINE_R)
        with Locations((-12, 36)):
            Circle(SZYK_KO_OWY3_OUTLINE_R)
        with Locations((-48, 24)):
            Circle(SZYK_KO_OWY3_OUTLINE_R)
        with Locations((-36, 24)):
            Circle(SZYK_KO_OWY3_OUTLINE_R)
        with Locations((-48, 12)):
            Circle(SZYK_KO_OWY3_OUTLINE_R)
        with Locations((-12, 24)):
            Circle(SZYK_KO_OWY3_OUTLINE_R)
        with Locations((-24, 24)):
            Circle(SZYK_KO_OWY3_OUTLINE_R)
        with Locations((-36, -48)):
            Circle(SZYK_KO_OWY3_OUTLINE_R)
        with Locations((-36, -36)):
            Circle(SZYK_KO_OWY3_OUTLINE_R)
        with Locations((-36, -24)):
            Circle(SZYK_KO_OWY3_OUTLINE_R)
        with Locations((-48, -12)):
            Circle(SZYK_KO_OWY3_OUTLINE_R)
        with Locations((-48, -24)):
            Circle(SZYK_KO_OWY3_OUTLINE_R)
        with Locations((-48, -36)):
            Circle(SZYK_KO_OWY3_OUTLINE_R)
        with Locations((-48, -48)):
            Circle(SZYK_KO_OWY3_OUTLINE_R)
        with Locations((-12, -12)):
            Circle(SZYK_KO_OWY3_OUTLINE_R)
        with Locations((-12, -24)):
            Circle(SZYK_KO_OWY3_OUTLINE_R)
        with Locations((-12, -36)):
            Circle(SZYK_KO_OWY3_OUTLINE_R)
        with Locations((-36, -12)):
            Circle(SZYK_KO_OWY3_OUTLINE_R)
        with Locations((-24, -48)):
            Circle(SZYK_KO_OWY3_OUTLINE_R)
        with Locations((-24, -36)):
            Circle(SZYK_KO_OWY3_OUTLINE_R)
        with Locations((-12, -48)):
            Circle(SZYK_KO_OWY3_OUTLINE_R)
        with Locations((-24, -12)):
            Circle(SZYK_KO_OWY3_OUTLINE_R)
        with Locations((-24, -24)):
            Circle(SZYK_KO_OWY3_OUTLINE_R)
    extrude(amount=SZYK_KO_OWY3_DEPTH, mode=Mode.SUBTRACT)


solid = part.part
